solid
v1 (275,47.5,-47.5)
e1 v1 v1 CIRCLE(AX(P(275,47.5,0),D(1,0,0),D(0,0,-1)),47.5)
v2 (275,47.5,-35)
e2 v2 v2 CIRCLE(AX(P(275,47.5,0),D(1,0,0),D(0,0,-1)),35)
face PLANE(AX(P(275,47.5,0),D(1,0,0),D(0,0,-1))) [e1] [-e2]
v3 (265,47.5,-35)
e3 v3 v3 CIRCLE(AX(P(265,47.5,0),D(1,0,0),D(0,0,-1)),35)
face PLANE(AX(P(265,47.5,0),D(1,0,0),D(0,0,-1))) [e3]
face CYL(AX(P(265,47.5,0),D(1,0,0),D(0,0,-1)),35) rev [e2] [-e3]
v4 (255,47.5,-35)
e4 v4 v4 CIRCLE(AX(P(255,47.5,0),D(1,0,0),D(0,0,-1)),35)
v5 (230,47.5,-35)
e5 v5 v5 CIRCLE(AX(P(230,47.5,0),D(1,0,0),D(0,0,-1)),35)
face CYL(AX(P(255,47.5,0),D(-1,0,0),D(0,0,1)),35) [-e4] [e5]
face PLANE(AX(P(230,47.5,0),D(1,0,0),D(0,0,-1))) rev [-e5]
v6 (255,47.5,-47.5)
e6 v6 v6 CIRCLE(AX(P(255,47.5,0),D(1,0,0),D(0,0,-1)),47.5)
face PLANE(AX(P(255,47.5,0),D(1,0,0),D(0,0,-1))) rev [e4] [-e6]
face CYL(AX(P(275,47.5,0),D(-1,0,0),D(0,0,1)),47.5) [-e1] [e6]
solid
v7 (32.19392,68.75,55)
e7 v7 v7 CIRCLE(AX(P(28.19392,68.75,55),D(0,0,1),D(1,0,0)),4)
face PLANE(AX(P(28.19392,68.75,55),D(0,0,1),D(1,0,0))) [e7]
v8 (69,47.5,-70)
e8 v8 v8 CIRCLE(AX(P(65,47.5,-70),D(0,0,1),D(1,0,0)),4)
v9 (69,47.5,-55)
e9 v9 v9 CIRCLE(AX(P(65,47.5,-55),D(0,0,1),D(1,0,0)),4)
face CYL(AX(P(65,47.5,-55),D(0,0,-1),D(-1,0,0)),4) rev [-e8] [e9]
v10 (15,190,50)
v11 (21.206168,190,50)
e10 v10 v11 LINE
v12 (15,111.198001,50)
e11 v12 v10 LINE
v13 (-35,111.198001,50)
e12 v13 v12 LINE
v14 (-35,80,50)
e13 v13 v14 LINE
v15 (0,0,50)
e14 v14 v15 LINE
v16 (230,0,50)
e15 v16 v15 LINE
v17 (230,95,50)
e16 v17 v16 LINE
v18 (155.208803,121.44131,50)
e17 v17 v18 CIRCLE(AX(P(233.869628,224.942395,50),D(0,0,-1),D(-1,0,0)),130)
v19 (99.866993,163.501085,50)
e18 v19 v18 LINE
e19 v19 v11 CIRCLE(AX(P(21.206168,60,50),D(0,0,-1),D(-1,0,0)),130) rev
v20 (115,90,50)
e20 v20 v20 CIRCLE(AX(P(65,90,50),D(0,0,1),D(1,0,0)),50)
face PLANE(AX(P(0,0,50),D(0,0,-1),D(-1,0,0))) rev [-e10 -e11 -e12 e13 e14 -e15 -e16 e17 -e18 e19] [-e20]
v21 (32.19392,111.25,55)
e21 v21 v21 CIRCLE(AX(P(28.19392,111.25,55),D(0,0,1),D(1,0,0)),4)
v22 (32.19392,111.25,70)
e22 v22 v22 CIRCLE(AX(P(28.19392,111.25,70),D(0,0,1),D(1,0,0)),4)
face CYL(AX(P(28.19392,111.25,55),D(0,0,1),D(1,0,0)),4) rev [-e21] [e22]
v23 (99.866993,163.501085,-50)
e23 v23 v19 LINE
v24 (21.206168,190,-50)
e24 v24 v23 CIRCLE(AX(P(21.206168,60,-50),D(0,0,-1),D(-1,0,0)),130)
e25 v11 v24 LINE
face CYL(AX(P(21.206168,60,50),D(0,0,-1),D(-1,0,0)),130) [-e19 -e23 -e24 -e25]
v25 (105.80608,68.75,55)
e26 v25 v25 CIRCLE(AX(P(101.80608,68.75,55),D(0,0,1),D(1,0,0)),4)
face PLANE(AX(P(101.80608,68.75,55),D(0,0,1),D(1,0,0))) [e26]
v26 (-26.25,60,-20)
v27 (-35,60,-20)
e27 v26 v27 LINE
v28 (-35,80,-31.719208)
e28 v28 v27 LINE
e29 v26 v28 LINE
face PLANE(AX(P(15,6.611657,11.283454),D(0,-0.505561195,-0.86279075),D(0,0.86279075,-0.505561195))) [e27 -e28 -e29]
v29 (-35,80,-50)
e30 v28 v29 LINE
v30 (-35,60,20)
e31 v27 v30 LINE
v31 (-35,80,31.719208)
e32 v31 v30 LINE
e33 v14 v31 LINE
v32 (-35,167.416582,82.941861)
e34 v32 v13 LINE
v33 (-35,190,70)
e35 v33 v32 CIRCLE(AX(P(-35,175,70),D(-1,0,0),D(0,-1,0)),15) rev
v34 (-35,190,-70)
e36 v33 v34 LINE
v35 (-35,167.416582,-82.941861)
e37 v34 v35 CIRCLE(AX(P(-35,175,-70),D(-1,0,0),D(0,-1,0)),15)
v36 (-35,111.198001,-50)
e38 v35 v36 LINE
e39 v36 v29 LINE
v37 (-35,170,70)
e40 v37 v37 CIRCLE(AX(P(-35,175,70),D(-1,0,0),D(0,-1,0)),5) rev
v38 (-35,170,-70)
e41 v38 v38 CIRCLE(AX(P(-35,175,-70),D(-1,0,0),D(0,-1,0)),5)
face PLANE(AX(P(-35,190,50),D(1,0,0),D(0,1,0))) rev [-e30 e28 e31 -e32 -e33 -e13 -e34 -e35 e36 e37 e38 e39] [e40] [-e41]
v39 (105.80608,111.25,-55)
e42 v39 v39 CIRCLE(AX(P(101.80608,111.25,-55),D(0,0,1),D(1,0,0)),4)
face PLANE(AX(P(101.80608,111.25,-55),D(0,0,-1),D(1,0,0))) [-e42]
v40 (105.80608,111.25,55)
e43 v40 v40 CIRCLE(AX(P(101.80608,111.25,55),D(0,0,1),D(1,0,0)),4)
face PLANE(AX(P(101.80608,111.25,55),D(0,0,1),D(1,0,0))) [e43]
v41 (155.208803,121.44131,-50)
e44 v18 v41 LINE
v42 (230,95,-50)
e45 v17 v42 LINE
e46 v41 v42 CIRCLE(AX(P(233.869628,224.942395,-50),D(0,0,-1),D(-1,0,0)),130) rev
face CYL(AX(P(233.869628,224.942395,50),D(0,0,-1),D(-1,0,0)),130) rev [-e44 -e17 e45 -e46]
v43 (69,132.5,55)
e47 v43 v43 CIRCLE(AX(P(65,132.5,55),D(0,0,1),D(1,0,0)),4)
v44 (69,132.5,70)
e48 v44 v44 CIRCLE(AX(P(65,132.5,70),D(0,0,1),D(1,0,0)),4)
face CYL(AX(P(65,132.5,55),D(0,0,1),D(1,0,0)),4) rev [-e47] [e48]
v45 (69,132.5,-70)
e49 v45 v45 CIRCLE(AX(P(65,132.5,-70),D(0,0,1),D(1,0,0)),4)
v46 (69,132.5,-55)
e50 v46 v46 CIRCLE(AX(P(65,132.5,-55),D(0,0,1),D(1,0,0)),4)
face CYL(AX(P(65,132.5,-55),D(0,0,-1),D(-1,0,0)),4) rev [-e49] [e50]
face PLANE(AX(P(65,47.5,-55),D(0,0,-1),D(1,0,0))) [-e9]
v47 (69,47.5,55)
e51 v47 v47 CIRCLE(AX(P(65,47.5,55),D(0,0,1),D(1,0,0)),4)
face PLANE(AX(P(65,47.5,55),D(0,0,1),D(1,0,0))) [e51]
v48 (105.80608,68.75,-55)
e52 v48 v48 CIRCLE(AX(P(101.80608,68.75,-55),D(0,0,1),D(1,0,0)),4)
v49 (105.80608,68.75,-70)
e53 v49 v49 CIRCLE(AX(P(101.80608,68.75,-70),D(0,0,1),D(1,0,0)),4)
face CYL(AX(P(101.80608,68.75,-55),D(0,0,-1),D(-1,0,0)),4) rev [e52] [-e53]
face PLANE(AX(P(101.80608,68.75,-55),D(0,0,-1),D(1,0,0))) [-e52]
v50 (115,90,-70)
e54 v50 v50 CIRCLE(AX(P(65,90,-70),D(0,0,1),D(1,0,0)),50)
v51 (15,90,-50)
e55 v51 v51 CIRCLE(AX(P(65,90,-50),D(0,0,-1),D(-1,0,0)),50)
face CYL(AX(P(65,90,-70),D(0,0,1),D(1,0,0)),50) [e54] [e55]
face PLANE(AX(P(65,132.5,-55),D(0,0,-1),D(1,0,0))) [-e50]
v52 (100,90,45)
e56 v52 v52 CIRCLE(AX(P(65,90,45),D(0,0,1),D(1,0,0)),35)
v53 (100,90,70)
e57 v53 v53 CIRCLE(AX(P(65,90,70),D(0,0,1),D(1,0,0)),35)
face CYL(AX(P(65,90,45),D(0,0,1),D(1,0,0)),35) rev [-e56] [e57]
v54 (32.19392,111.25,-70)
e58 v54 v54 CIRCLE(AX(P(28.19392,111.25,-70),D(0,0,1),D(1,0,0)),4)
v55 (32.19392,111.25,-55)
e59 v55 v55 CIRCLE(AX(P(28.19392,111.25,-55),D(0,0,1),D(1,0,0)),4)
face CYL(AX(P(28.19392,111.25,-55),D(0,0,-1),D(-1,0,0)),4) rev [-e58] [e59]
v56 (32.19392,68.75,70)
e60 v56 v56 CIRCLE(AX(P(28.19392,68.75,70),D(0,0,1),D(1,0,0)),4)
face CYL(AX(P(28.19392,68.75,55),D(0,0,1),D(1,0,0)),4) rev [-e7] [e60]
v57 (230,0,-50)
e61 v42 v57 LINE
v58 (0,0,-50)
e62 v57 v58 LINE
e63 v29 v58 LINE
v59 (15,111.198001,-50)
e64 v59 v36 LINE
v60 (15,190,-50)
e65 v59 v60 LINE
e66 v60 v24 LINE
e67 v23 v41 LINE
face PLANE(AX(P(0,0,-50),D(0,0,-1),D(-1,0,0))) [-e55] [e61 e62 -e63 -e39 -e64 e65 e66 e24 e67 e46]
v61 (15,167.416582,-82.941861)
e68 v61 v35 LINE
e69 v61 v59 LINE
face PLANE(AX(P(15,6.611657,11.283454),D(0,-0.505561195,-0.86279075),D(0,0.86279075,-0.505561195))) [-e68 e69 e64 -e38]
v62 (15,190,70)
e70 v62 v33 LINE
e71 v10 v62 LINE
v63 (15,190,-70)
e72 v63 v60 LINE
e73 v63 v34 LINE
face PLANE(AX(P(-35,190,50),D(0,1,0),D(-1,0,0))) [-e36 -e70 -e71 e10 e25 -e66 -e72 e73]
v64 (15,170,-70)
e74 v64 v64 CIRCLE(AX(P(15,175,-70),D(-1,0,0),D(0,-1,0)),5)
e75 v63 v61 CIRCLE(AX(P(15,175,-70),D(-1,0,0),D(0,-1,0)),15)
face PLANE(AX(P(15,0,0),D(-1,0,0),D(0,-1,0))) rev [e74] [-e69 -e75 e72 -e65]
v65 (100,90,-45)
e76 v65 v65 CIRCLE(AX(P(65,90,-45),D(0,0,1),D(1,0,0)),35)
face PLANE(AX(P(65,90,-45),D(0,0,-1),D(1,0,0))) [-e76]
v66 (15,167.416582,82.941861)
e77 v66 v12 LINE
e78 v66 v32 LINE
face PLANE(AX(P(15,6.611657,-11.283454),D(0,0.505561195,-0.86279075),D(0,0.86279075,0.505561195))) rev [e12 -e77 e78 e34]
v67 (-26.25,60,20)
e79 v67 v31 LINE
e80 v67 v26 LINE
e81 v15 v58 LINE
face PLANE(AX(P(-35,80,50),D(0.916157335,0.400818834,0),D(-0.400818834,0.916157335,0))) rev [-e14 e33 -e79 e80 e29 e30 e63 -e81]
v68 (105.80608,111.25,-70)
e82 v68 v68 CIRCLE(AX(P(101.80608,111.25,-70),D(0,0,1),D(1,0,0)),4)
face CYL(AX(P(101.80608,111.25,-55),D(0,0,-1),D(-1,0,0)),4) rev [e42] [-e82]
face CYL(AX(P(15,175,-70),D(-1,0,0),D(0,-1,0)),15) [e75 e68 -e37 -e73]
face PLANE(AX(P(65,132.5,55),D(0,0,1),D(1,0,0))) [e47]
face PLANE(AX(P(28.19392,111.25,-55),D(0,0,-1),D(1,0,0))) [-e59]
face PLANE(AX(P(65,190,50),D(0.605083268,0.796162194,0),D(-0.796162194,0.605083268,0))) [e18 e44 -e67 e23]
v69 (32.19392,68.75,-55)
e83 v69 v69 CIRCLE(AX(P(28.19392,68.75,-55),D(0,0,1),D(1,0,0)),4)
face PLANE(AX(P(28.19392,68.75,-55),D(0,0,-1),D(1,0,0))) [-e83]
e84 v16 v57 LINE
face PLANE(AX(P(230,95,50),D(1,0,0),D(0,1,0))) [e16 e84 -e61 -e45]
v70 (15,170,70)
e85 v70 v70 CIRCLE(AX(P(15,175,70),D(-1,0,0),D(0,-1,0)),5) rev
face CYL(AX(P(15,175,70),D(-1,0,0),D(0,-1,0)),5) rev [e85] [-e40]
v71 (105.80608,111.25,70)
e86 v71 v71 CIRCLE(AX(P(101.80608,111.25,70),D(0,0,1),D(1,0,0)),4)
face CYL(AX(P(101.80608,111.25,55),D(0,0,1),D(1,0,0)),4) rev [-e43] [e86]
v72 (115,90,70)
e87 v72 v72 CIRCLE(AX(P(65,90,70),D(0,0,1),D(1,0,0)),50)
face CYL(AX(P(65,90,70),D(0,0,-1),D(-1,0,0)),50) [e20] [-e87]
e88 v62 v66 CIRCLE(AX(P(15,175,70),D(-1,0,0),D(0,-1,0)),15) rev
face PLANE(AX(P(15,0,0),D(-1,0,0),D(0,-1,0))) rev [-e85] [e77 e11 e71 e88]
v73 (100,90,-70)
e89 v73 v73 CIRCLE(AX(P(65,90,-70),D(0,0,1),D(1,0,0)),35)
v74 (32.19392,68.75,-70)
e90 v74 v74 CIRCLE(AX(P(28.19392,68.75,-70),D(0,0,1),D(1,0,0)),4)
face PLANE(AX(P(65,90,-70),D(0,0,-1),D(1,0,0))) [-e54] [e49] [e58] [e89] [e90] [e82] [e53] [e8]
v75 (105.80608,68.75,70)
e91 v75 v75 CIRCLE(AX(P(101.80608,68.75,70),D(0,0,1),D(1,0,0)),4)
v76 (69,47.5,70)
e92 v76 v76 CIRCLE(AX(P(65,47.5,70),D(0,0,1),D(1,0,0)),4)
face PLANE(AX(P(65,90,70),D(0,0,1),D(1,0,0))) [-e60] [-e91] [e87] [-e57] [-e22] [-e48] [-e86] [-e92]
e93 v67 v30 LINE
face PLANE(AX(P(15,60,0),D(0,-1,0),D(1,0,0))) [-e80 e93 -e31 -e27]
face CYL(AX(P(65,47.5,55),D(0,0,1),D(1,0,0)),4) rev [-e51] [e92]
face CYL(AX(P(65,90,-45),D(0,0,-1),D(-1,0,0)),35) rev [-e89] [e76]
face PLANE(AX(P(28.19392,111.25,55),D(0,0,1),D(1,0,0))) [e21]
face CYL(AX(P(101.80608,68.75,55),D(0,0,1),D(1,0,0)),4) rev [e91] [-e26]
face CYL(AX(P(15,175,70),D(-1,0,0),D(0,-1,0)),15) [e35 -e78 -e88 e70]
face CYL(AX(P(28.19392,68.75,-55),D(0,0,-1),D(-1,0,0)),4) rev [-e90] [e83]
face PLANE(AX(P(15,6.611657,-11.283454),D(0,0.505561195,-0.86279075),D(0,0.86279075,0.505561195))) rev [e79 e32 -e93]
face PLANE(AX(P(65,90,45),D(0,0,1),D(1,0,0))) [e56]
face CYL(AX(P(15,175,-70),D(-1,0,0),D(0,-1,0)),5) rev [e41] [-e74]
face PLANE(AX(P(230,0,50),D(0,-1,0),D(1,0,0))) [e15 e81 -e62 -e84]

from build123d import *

# Parameters (mm, degrees)
DODANIE_WYCI_GNI_CIE1_DEPTH = 50
SZKIC2_R                    = 35
DODANIE_WYCI_GNI_CIE2_DEPTH = 25
SZKIC3_R                    = 47.5
DODANIE_WYCI_GNI_CIE3_DEPTH = 20
SZKIC7_R                    = 50
DODANIE_WYCI_GNI_CIE5_DEPTH = 20
SZKIC8_R                    = 35
WYTNIJ_WYCI_GNI_CIE1_DEPTH  = 25
SZKIC9_R                    = 4
WYTNIJ_WYCI_GNI_CIE2_DEPTH  = 15
SZKIC12_R                   = 5
DODANIE_WYCI_GNI_CIE6_DEPTH = 50
ZAOKR_GLENIE2_R             = 130
ZAOKR_GLENIE3_R             = 130
SZKIC4_R                    = 35
WYTNIJ_WYCI_GNI_CIE3_DEPTH  = 10


with BuildPart() as part:
    # Szkic1 → Dodanie-wyciągnięcie1 (new, symmetric)
    with BuildSketch(Plane.XY):
        Polygon((-35, 190), (65, 190), (190, 95), (230, 95), (230, 0), (0, 0), (-35, 80), align=None)
    extrude(amount=DODANIE_WYCI_GNI_CIE1_DEPTH, both=True)

    # Szkic7 → Dodanie-wyciągnięcie5 (add)
    with BuildSketch(Plane.XY.offset(50)):
        with Locations((65, 90)):
            Circle(SZKIC7_R)
    dodanie_wyci_gni_cie5 = extrude(amount=DODANIE_WYCI_GNI_CIE5_DEPTH)

    # Szkic8 → Wytnij-wyciągnięcie1 (cut)
    with BuildSketch(Plane.XY.offset(70)):
        with Locations((65, 90)):
            Circle(SZKIC8_R)
    wytnij_wyci_gni_cie1 = extrude(amount=-WYTNIJ_WYCI_GNI_CIE1_DEPTH, mode=Mode.SUBTRACT)

    # Szkic9 → Wytnij-wyciągnięcie2 (cut)
    with BuildSketch(Plane.XY.offset(70)):
        with Locations((65, 132.5)):
            Circle(SZKIC9_R)
        with Locations((101.806079661, 111.25)):
            Circle(SZKIC9_R)
        with Locations((101.806079661, 68.75)):
            Circle(SZKIC9_R)
        with Locations((65, 47.5)):
            Circle(SZKIC9_R)
        with Locations((28.193920339, 68.75)):
            Circle(SZKIC9_R)
        with Locations((28.193920339, 111.25)):
            Circle(SZKIC9_R)
    wytnij_wyci_gni_cie2 = extrude(amount=-WYTNIJ_WYCI_GNI_CIE2_DEPTH, mode=Mode.SUBTRACT)

    # Szkic12 → Dodanie-wyciągnięcie6 (add)
    # profile 1 of 6: a face of its own
    with BuildSketch(Plane.ZY.offset(35)):
        with BuildLine():
            Line((-50, 190), (-70, 190))
            ThreePointArc((-70, 190), (-83.014439461, 182.458174409), (-82.941861244, 167.416582068))
            Line((-82.941861244, 167.416582068), (-50, 111.198000795))
            Line((-50, 111.198000795), (-50, 190))
        make_face()
        with Locations(Location((-70, 175, 0), (0, 0, 270))):
            Circle(SZKIC12_R, mode=Mode.SUBTRACT)
    # profile 2 of 6: a face of its own
    with BuildSketch(Plane.ZY.offset(35)):
        Polygon((0, 190), (-50, 190), (-50, 111.198000795), (-31.7192076, 80), (0, 80), align=None)
    # profile 3 of 6: a face of its own
    with BuildSketch(Plane.ZY.offset(35)):
        Polygon((50, 190), (0, 190), (0, 80), (31.7192076, 80), (50, 111.198000795), align=None)
    # profile 4 of 6: a face of its own
    with BuildSketch(Plane.ZY.offset(35)):
        with BuildLine():
            Line((70, 190), (50, 190))
            Line((50, 190), (50, 111.198000795))
            Line((50, 111.198000795), (82.941861244, 167.416582068))
            ThreePointArc((82.941861244, 167.416582068), (83.014439461, 182.458174409), (70, 190))
        make_face()
        with Locations(Location((70, 175, 0), (0, 0, 270))):
            Circle(SZKIC12_R, mode=Mode.SUBTRACT)
    # profile 5 of 6: a face of its own
    with BuildSketch(Plane.ZY.offset(35)):
        Polygon((31.7192076, 80), (0, 80), (0, 60), (20, 60), align=None)
    # profile 6 of 6: a face of its own
    with BuildSketch(Plane.ZY.offset(35)):
        Polygon((0, 60), (0, 80), (-31.7192076, 80), (-20, 60), align=None)
    extrude(amount=-DODANIE_WYCI_GNI_CIE6_DEPTH)

    # Lustro1: Dodanie-wyciągnięcie5, Wytnij-wyciągnięcie1, Wytnij-wyciągnięcie2 across plane
    add(dodanie_wyci_gni_cie5.mirror(Plane.XY))
    add(wytnij_wyci_gni_cie1.mirror(Plane.XY), mode=Mode.SUBTRACT)
    add(wytnij_wyci_gni_cie2.mirror(Plane.XY), mode=Mode.SUBTRACT)

    # Zaokrąglenie2
    zaokr_glenie2_edges = [part.edges().sort_by_distance(p)[0] for p in [
        (65, 190, 0),
    ]]
    fillet(zaokr_glenie2_edges, radius=ZAOKR_GLENIE2_R)

    # Zaokrąglenie3
    # the kernel refuses this fillet: 130 mm, written as the material it adds along each edge
    with BuildSketch(Plane(origin=(190, 95, 50), x_dir=(-0.7961621941231027, 0.6050832675335577, 0), z_dir=(0, 0, -1))) as zaokr_glenie3_piece_1:
        with BuildLine():
            CenterArc((43.698629651, 130), ZAOKR_GLENIE3_R, 234.470905265, 35.529094735)
            Line((-31.846487765, 24.203330701), (-33.357390113, 22.087397315))
            ThreePointArc((-33.357390113, 22.087397315), (-17.496460378, 10.031643646), (-1.573216496, -2.070021705))
            Line((-1.573216496, -2.070021705), (0, -2.6))
            Line((0, -2.6), (43.698629651, -2.6))
            Line((43.698629651, -2.6), (43.698629651, 0))
        make_face()
    extrude(amount=100)


with BuildPart() as body_2:
    # Szkic2 → Dodanie-wyciągnięcie2 (new body)
    with BuildSketch(Plane(origin=(230, 0, 0), x_dir=(0, 0, -1), z_dir=(1, 0, 0))):
        with Locations((0, 47.5)):
            Circle(SZKIC2_R)
    extrude(amount=DODANIE_WYCI_GNI_CIE2_DEPTH)

    # Szkic3 → Dodanie-wyciągnięcie3 (add)
    with BuildSketch(Plane(origin=(255, 0, 0), x_dir=(0, 0, -1), z_dir=(1, 0, 0))):
        with Locations((0, 47.5)):
            Circle(SZKIC3_R)
    extrude(amount=DODANIE_WYCI_GNI_CIE3_DEPTH)

    # Szkic4 → Wytnij-wyciągnięcie3 (cut)
    with BuildSketch(Plane(origin=(275, 0, 0), x_dir=(0, 0, -1), z_dir=(1, 0, 0))):
        with Locations((0, 47.5)):
            Circle(SZKIC4_R)
    extrude(amount=-WYTNIJ_WYCI_GNI_CIE3_DEPTH, mode=Mode.SUBTRACT)


solid = Compound([part.part, body_2.part])
